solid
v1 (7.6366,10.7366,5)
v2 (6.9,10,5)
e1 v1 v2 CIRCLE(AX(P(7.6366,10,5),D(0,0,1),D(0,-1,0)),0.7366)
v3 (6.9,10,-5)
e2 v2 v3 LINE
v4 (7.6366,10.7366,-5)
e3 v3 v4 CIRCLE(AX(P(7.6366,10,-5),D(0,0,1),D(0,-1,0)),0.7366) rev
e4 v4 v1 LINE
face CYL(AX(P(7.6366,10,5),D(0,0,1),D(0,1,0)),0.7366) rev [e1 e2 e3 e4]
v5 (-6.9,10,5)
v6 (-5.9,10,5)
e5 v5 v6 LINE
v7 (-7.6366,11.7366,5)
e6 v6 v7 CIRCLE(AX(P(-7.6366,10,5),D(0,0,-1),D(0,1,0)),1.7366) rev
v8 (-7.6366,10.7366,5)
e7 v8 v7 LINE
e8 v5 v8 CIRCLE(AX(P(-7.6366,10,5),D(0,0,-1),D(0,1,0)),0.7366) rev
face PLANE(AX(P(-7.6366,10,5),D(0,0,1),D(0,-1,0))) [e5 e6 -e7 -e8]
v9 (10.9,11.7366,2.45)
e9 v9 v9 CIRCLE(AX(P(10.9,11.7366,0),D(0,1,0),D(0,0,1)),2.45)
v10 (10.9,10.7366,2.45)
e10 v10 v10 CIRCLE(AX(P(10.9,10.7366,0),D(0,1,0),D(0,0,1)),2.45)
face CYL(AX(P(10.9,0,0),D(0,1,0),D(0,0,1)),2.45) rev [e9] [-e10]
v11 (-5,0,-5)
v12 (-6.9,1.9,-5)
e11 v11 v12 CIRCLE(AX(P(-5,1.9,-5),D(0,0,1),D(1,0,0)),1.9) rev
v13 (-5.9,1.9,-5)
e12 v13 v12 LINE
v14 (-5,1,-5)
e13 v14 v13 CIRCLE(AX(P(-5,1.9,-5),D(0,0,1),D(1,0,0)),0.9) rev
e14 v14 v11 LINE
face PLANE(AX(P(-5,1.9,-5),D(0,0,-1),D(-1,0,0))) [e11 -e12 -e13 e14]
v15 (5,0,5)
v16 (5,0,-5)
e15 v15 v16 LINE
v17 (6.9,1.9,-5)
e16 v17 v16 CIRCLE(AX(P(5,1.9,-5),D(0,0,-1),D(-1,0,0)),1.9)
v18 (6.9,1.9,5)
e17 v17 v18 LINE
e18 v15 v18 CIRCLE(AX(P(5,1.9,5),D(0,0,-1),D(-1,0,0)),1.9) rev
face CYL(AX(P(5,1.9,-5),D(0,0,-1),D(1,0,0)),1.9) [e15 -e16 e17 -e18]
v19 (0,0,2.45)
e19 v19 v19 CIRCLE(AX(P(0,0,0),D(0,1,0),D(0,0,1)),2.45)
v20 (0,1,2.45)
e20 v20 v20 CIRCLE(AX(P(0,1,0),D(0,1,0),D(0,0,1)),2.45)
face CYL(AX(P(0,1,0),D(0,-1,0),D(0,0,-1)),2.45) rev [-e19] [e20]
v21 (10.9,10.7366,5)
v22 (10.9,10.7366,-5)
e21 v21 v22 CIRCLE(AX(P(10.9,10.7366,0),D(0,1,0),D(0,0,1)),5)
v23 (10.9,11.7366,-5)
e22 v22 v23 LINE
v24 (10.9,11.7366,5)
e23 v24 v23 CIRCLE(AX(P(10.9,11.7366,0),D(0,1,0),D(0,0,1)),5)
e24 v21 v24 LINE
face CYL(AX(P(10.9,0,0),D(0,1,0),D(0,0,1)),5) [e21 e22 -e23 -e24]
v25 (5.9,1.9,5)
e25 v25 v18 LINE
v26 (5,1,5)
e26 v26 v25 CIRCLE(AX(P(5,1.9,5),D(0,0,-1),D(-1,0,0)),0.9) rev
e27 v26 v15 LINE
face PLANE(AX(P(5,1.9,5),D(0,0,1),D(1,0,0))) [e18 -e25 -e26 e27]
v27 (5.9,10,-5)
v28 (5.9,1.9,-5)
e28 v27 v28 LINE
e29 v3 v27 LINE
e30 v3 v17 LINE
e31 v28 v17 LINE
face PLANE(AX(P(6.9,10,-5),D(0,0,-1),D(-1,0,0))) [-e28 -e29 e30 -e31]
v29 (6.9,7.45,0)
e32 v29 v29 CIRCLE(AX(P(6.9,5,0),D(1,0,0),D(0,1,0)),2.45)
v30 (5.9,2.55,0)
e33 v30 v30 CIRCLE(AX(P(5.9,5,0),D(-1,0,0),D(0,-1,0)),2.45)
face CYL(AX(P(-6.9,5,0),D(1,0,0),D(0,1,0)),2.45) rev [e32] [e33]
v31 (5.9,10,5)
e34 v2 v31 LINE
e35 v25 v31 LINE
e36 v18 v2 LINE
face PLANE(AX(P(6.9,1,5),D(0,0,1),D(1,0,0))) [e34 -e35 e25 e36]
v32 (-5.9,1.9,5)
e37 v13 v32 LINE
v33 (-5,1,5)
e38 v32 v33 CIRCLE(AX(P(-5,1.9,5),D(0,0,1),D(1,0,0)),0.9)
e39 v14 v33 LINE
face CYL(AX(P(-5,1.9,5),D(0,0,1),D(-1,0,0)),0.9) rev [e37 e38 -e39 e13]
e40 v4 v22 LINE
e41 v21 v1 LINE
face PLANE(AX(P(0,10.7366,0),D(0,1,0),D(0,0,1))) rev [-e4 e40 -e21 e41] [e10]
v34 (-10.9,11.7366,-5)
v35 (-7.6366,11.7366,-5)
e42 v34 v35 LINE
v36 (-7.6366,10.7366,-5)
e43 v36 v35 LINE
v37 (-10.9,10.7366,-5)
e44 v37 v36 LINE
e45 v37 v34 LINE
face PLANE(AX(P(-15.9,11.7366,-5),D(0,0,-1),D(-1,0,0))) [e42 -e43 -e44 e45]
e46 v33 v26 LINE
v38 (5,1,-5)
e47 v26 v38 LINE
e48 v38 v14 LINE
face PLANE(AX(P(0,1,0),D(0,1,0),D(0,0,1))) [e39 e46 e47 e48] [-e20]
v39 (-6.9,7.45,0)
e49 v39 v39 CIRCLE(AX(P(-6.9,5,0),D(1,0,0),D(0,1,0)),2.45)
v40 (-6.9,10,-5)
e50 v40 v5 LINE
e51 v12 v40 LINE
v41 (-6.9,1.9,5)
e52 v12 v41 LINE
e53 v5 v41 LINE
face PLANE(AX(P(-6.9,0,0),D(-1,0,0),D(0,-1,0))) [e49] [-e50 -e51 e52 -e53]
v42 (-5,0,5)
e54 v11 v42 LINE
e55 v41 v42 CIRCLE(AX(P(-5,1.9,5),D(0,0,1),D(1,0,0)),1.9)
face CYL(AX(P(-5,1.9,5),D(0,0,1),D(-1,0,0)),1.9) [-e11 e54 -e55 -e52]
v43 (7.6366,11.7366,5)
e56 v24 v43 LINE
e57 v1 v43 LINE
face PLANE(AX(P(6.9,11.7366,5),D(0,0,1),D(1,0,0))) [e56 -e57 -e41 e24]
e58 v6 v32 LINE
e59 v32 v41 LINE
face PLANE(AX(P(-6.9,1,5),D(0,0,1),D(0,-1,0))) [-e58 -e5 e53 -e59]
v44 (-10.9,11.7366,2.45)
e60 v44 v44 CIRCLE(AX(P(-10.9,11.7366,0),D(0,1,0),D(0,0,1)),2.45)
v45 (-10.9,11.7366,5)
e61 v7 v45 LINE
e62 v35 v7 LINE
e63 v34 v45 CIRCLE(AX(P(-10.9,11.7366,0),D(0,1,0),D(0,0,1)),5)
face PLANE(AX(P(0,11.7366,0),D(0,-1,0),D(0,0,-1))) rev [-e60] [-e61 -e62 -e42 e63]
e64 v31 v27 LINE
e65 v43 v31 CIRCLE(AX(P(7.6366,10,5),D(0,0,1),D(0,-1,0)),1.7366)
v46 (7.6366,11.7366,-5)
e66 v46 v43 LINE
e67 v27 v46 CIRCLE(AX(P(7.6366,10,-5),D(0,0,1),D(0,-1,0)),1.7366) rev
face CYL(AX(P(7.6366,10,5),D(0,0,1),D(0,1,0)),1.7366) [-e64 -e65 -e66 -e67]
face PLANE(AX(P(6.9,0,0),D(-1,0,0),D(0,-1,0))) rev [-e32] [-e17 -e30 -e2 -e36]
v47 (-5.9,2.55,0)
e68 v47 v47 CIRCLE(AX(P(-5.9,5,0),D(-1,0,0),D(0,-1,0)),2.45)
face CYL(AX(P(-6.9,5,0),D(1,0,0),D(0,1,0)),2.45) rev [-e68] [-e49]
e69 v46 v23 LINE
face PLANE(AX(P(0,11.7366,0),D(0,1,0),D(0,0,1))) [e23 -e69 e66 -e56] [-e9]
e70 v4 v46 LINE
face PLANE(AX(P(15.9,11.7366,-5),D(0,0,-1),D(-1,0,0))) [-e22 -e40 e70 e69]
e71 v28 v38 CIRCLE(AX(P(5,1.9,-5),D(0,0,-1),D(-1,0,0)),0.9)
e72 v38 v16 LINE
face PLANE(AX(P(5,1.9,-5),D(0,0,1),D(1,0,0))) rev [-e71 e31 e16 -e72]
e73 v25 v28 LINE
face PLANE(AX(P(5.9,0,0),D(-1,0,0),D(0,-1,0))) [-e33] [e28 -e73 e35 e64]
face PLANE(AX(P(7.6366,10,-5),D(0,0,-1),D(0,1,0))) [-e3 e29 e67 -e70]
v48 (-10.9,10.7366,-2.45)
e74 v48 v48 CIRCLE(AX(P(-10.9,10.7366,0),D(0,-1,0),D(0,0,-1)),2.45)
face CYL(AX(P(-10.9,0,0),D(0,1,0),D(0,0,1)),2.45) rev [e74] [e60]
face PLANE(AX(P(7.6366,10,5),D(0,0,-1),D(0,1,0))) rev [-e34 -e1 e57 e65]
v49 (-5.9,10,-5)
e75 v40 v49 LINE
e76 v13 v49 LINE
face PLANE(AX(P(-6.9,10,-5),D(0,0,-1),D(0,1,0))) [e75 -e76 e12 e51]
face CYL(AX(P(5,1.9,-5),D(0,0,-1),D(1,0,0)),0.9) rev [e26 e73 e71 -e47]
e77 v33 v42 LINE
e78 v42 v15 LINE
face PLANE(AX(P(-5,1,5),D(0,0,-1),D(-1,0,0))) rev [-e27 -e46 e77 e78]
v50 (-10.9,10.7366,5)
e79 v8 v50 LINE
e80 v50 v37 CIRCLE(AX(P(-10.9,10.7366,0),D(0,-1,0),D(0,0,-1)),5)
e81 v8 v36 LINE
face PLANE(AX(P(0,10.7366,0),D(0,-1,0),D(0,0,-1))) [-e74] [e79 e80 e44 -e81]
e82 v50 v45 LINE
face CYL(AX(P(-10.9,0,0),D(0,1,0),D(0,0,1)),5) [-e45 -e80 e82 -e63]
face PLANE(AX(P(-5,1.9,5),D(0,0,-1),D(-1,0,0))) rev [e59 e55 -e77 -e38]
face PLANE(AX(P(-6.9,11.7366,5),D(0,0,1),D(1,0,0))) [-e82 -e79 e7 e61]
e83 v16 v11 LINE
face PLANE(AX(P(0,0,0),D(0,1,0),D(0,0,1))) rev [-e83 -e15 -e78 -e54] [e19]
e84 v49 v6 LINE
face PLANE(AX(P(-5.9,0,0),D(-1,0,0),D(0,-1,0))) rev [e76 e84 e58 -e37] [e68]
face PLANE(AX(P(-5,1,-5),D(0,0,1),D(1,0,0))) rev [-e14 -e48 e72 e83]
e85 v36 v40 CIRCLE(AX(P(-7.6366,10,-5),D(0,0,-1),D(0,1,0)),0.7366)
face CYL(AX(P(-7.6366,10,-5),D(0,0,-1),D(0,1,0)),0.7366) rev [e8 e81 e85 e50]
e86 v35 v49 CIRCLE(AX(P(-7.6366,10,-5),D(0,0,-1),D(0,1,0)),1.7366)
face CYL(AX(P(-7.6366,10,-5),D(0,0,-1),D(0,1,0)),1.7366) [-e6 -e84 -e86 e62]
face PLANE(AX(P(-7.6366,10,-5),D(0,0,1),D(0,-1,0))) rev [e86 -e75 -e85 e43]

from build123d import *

# Parameters (mm, degrees)
SKETCH1_W               = 10
SKETCH1_H               = 10
SKETCH1_R               = 2.45
BASE_FLANGE1_DEPTH      = 1
EDGE_FLANGE1_DEPTH      = 10
EDGE_FLANGE1_BEND_DEPTH = 10
SKETCH12_R              = 2.45
CUT_EXTRUDE1_DEPTH      = 18.760630619
EDGE_FLANGE2_DEPTH      = 10
EDGE_FLANGE2_BEND_DEPTH = 10
SKETCH19_R              = 2.45
CUT_EXTRUDE2_DEPTH      = 21.385234351
CUT_EXTRUDE3_DEPTH      = 21.385234351


# Sheet-metal steps are written as plain solids
with BuildPart() as part:
    # Sketch1 → Base-Flange1 (new body)
    with BuildSketch(Plane(origin=(0, 0, 0), x_dir=(1, 0, 0), z_dir=(0, 1, 0))):
        Rectangle(SKETCH1_W, SKETCH1_H)
        with Locations(Location((0, 0, 0), (0, 0, 270))):
            Circle(SKETCH1_R, mode=Mode.SUBTRACT)
    extrude(amount=BASE_FLANGE1_DEPTH)

    # Edge-Flange1 section (across the edge) → Edge-Flange1 (add)
    with BuildSketch(Plane(origin=(-5.9, 1, -5), x_dir=(1, 0, 0), z_dir=(0, 0, 1))):
        with BuildLine():
            Line((-1, 0.9), (-1, 9))
            Line((-1, 9), (0, 9))
            Line((0, 9), (0, 0.9))
            ThreePointArc((0, 0.9), (0.263603897, 0.263603897), (0.9, 0))
            Line((0.9, 0), (0.9, -1))
            ThreePointArc((0.9, -1), (-0.443502884, -0.443502884), (-1, 0.9))
        make_face()
    extrude(amount=EDGE_FLANGE1_DEPTH)

    # Edge-Flange1 section 2 (across the edge) → Edge-Flange1 bend (add)
    with BuildSketch(Plane(origin=(5.9, 1, 5), x_dir=(-1, 0, 0), z_dir=(0, 0, -1))):
        with BuildLine():
            Line((-1, 0.9), (-1, 9))
            Line((-1, 9), (0, 9))
            Line((0, 9), (0, 0.9))
            ThreePointArc((0, 0.9), (0.263603897, 0.263603897), (0.9, 0))
            Line((0.9, 0), (0.9, -1))
            ThreePointArc((0.9, -1), (-0.443502884, -0.443502884), (-1, 0.9))
        make_face()
    extrude(amount=EDGE_FLANGE1_BEND_DEPTH)

    # Sketch12 → Cut-Extrude1 (cut, through all)
    with BuildSketch(Plane(origin=(6.9, 0, 0), x_dir=(0, 0, -1), z_dir=(1, 0, 0))):
        with Locations(Location((0, 5, 0), (0, 0, 90))):
            Circle(SKETCH12_R)
    extrude(amount=-CUT_EXTRUDE1_DEPTH, mode=Mode.SUBTRACT)

    # Edge-Flange2 section (across the edge) → Edge-Flange2 (add)
    with BuildSketch(Plane(origin=(6.9, 10.7366, -5), x_dir=(0, -1, 0), z_dir=(0, 0, 1))):
        with BuildLine():
            Line((-1, 0.7366), (-1, 9))
            Line((-1, 9), (0, 9))
            Line((0, 9), (0, 0.7366))
            ThreePointArc((0, 0.7366), (0.215745145, 0.215745145), (0.7366, 0))
            Line((0.7366, 0), (0.7366, -1))
            ThreePointArc((0.7366, -1), (-0.491361636, -0.491361636), (-1, 0.7366))
        make_face()
    extrude(amount=EDGE_FLANGE2_DEPTH)

    # Edge-Flange2 section 2 (across the edge) → Edge-Flange2 bend (add)
    with BuildSketch(Plane(origin=(-6.9, 10.7366, 5), x_dir=(0, -1, 0), z_dir=(0, 0, -1))):
        with BuildLine():
            Line((-1, 0.7366), (-1, 9))
            Line((-1, 9), (0, 9))
            Line((0, 9), (0, 0.7366))
            ThreePointArc((0, 0.7366), (0.215745145, 0.215745145), (0.7366, 0))
            Line((0.7366, 0), (0.7366, -1))
            ThreePointArc((0.7366, -1), (-0.491361636, -0.491361636), (-1, 0.7366))
        make_face()
    extrude(amount=EDGE_FLANGE2_BEND_DEPTH)

    # Sketch19 → Cut-Extrude2 (cut, through all)
    with BuildSketch(Plane(origin=(0, 11.7366, 0), x_dir=(1, 0, 0), z_dir=(0, 1, 0))):
        with Locations(Location((-10.9, 0, 0), (0, 0, 270))):
            Circle(SKETCH19_R)
        with Locations(Location((10.9, 0, 0), (0, 0, 270))):
            Circle(SKETCH19_R)
    extrude(amount=-CUT_EXTRUDE2_DEPTH, mode=Mode.SUBTRACT)

    # Sketch20 → Cut-Extrude3 (cut, through all)
    with BuildSketch(Plane(origin=(0, 11.7366, 0), x_dir=(1, 0, 0), z_dir=(0, 1, 0))):
        with BuildLine():
            Line((15.9, -5), (15.9, -3.1e-08))
            ThreePointArc((15.9, -3.1e-08), (14.435533895, -3.535533917), (10.9, -5))
            Line((10.9, -5), (15.9, -5))
        make_face()
        with BuildLine():
            Line((15.9, 5), (10.9, 5))
            ThreePointArc((10.9, 5), (14.435533917, 3.535533895), (15.9, -3.1e-08))
            Line((15.9, -3.1e-08), (15.9, 5))
        make_face()
        with BuildLine():
            ThreePointArc((-10.9, -5), (-14.435533906, -3.535533906), (-15.9, 0))
            Line((-15.9, 0), (-15.9, -5))
            Line((-15.9, -5), (-10.9, -5))
        make_face()
        with BuildLine():
            ThreePointArc((-15.9, 0), (-14.435533906, 3.535533906), (-10.9, 5))
            Line((-10.9, 5), (-15.9, 5))
            Line((-15.9, 5), (-15.9, 0))
        make_face()
    extrude(amount=-CUT_EXTRUDE3_DEPTH, mode=Mode.SUBTRACT)


solid = part.part
